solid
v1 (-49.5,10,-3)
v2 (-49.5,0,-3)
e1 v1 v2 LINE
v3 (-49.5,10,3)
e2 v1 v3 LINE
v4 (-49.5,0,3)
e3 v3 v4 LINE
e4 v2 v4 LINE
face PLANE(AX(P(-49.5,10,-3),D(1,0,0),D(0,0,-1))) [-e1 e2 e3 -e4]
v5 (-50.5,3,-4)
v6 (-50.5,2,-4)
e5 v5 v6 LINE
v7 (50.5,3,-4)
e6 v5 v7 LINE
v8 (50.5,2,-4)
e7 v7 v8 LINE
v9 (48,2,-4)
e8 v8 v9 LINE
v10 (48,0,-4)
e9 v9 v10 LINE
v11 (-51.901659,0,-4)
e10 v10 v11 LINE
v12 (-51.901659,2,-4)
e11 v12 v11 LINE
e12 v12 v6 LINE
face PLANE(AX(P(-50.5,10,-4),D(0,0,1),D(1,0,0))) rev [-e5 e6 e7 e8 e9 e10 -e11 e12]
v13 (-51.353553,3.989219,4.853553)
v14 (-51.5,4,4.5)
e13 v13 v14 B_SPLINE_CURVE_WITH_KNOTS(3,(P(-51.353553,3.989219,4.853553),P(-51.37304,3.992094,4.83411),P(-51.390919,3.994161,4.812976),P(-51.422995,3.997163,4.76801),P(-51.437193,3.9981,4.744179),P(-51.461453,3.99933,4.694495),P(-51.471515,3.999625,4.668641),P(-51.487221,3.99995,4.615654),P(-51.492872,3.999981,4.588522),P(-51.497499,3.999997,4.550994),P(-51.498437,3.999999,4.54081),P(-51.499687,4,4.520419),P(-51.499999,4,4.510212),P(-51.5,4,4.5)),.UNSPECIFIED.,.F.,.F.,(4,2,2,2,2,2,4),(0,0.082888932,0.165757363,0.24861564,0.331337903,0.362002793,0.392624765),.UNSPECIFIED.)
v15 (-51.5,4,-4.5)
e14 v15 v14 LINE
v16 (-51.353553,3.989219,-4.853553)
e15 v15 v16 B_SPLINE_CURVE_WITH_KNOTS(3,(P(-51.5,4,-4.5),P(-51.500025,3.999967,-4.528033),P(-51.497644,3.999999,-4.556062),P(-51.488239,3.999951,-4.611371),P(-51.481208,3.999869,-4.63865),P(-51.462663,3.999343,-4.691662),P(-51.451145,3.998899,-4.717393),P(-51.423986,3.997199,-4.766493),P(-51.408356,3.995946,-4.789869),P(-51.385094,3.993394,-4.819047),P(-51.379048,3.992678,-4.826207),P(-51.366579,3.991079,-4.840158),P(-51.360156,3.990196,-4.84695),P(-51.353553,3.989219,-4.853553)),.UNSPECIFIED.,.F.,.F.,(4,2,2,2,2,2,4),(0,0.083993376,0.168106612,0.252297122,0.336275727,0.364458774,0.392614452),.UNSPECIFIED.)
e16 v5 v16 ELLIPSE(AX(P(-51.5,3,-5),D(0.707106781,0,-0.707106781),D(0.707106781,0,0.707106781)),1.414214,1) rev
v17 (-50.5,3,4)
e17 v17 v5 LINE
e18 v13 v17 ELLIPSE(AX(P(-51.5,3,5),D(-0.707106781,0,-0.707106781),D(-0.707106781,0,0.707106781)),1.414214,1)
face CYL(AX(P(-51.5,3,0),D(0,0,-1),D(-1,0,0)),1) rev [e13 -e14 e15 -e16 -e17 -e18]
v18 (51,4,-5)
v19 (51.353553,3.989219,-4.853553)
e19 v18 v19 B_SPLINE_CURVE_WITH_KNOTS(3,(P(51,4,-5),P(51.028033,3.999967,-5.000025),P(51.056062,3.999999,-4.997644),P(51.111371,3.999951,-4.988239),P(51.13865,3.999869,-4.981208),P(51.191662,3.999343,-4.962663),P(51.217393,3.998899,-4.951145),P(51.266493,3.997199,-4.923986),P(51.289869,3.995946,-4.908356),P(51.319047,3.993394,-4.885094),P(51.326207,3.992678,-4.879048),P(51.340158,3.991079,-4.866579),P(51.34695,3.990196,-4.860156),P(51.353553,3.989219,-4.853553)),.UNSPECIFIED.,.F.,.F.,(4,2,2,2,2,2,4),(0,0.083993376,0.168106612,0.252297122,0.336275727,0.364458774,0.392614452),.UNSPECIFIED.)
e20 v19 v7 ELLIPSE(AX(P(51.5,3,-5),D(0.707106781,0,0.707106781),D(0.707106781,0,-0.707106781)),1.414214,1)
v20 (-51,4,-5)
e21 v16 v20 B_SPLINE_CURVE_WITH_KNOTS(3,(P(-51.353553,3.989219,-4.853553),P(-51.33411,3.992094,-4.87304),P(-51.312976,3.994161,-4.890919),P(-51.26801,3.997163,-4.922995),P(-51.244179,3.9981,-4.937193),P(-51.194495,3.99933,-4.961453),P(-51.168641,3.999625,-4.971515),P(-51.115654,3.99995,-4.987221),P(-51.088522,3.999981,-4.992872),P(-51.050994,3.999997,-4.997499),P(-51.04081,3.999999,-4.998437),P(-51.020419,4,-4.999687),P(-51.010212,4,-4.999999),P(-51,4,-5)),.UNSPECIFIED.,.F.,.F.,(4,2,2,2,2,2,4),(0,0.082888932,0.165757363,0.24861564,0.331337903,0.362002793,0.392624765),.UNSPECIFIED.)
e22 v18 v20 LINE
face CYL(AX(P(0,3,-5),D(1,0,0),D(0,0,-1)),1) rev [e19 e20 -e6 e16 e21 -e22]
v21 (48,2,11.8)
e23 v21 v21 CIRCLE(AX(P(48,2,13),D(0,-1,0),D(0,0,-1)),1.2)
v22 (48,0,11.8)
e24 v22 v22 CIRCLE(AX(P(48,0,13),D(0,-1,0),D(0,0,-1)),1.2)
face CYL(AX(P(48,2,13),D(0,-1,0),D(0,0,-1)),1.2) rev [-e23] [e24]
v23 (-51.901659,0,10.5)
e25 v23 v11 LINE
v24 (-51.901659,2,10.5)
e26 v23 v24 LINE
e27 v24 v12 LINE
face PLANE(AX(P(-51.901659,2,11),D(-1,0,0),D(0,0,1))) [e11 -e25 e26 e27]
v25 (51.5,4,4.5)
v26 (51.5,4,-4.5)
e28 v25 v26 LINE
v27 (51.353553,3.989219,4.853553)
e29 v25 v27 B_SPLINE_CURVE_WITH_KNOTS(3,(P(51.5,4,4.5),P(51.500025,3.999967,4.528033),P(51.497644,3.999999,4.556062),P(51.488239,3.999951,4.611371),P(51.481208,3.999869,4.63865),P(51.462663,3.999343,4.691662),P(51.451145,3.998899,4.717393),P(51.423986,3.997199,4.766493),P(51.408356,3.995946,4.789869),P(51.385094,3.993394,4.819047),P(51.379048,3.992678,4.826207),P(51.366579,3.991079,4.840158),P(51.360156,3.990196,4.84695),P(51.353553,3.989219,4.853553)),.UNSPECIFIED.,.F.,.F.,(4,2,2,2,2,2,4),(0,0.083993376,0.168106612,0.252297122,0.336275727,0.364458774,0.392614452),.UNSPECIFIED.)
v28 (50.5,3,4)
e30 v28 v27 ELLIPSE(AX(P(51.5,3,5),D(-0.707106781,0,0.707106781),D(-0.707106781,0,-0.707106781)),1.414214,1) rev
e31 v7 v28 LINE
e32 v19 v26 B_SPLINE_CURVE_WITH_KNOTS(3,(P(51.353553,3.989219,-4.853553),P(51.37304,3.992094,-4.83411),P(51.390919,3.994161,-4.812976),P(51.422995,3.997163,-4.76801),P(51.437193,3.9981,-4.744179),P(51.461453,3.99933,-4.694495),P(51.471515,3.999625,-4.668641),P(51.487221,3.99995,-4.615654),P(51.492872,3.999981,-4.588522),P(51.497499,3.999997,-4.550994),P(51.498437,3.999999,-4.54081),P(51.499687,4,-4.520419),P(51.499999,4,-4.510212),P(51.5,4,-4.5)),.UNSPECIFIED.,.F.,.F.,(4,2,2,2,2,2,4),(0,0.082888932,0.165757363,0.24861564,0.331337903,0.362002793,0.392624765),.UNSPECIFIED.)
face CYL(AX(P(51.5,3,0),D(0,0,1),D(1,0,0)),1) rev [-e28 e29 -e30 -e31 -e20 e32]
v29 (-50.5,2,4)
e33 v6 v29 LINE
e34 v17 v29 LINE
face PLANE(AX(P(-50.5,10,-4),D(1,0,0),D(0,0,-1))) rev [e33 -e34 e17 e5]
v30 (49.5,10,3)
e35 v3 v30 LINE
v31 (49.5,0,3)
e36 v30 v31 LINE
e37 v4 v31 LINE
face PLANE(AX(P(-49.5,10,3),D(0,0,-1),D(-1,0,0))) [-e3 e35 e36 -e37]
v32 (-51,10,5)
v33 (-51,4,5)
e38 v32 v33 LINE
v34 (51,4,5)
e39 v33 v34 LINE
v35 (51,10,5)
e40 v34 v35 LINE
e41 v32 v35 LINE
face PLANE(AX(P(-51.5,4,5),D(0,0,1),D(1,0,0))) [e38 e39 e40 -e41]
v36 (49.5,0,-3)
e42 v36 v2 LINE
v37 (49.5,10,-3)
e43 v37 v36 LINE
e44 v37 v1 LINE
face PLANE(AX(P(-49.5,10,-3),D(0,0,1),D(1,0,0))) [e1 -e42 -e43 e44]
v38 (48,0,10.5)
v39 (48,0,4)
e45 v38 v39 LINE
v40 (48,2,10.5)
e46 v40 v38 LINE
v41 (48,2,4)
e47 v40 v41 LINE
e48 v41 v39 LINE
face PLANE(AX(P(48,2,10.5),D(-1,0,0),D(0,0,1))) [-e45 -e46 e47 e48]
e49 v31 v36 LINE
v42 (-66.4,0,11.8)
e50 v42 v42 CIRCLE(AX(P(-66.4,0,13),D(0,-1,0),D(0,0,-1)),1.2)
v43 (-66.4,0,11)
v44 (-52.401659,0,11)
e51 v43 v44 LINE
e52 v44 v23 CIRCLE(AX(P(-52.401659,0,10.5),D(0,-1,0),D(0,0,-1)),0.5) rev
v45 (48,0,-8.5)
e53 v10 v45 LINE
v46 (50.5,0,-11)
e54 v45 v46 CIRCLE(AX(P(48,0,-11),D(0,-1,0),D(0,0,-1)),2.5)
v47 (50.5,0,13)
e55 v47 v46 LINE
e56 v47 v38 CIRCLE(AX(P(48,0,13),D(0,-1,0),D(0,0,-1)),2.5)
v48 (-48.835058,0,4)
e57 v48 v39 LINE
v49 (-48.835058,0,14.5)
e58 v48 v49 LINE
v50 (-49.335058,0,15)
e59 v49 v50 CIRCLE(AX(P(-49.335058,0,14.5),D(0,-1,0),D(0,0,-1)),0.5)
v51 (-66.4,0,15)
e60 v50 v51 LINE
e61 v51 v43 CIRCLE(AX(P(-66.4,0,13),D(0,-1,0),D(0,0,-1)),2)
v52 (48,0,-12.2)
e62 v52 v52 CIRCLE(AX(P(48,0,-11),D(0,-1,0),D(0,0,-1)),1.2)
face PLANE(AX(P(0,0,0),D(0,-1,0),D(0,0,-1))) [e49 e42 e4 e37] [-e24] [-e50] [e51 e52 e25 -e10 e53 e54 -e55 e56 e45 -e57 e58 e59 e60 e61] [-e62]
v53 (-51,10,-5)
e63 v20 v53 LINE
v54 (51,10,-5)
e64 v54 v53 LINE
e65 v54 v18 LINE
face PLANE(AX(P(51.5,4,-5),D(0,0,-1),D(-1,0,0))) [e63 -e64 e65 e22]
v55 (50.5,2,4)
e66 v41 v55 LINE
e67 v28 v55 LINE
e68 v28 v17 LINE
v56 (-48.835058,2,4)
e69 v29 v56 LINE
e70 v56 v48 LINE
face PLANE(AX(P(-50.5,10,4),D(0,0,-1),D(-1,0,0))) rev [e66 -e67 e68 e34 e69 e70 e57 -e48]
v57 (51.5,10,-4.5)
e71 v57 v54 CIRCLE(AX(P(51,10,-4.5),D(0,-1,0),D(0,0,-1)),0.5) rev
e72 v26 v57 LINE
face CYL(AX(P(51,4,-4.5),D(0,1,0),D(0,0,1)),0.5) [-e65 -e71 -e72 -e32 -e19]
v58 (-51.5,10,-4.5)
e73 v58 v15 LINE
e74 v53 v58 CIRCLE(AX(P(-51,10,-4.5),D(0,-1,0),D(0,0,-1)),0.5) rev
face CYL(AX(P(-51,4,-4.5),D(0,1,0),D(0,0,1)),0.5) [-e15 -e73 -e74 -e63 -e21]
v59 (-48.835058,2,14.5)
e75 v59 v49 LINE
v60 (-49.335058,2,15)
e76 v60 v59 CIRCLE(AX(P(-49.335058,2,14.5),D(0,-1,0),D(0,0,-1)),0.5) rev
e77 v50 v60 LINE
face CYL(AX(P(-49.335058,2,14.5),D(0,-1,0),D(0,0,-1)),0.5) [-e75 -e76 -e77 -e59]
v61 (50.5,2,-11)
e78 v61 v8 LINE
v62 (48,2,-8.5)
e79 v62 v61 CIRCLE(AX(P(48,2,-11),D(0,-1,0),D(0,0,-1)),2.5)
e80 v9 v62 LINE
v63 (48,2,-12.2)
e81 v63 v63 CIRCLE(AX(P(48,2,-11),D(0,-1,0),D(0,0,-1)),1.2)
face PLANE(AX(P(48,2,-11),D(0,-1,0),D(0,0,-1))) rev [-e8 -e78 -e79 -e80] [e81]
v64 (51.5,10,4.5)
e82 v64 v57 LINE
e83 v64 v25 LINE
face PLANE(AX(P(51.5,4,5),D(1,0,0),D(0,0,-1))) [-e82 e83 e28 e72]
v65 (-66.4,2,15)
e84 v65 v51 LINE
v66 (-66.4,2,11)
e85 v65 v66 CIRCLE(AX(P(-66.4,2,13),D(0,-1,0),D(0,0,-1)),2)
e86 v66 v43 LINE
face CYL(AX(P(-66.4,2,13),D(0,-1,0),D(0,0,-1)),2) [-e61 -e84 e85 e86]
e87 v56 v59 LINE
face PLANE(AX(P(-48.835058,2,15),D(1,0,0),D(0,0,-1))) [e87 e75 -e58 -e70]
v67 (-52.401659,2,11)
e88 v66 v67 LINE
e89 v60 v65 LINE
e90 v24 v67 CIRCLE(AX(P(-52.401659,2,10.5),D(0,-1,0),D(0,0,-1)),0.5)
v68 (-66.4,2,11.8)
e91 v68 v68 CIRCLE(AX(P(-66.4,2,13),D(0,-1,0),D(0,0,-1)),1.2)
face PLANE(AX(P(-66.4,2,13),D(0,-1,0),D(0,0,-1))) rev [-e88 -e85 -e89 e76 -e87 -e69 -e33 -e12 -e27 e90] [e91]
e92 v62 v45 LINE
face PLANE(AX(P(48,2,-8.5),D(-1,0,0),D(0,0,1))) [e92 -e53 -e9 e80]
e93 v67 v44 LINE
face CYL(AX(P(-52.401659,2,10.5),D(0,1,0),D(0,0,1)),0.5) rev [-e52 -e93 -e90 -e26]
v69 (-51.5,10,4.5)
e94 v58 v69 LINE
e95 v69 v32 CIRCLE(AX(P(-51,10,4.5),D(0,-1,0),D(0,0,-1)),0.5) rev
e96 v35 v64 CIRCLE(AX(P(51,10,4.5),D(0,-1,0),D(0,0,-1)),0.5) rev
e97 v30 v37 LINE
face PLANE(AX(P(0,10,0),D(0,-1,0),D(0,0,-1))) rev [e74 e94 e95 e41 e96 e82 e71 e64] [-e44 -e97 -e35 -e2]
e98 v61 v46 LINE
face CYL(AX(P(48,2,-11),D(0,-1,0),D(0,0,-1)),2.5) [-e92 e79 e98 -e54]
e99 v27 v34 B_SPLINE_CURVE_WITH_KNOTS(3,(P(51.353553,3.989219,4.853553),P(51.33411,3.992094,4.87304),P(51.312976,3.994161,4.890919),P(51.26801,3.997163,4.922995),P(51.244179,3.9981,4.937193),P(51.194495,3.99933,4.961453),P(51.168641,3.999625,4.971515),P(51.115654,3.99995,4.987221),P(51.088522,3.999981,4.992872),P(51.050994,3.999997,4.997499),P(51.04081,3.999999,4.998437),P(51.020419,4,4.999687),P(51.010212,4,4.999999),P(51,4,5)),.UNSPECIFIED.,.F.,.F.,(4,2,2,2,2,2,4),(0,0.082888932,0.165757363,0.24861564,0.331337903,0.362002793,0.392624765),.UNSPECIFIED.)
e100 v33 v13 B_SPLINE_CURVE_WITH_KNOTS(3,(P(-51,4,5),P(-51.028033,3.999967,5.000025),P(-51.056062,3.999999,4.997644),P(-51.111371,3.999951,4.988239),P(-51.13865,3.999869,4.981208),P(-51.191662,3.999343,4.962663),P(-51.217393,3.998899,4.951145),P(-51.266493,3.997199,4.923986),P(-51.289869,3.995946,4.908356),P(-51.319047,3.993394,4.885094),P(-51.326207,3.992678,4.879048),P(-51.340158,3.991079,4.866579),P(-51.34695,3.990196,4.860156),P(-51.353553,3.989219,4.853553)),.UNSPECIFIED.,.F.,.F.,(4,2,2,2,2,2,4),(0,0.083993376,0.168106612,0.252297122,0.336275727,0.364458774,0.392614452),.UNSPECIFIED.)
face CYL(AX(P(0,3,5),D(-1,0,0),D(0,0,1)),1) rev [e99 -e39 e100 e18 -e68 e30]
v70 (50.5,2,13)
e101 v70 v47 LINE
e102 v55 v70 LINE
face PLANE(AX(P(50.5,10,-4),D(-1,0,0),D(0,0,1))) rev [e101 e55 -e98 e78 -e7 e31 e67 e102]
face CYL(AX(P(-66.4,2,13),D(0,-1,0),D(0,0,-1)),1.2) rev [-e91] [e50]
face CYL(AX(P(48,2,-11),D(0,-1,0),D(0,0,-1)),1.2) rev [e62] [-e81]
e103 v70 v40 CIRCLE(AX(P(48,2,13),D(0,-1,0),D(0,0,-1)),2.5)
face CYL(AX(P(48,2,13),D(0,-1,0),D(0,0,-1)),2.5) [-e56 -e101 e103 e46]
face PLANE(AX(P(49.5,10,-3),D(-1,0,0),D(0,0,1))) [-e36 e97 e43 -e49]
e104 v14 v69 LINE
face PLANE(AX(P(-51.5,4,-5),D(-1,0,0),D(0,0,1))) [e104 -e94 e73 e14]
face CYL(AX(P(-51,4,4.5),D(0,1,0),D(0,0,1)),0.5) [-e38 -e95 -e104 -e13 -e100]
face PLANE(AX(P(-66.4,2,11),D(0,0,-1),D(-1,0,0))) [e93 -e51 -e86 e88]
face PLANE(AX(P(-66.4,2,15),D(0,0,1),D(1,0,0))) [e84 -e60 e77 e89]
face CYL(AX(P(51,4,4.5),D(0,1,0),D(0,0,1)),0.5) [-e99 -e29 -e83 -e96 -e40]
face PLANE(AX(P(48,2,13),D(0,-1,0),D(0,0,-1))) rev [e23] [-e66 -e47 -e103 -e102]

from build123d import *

# Parameters (mm, degrees)
SKETCH1_W           = 101
SKETCH1_H           = 8
SKETCH1_W_2         = 99
SKETCH1_H_2         = 6
BOSS_EXTRUDE1_DEPTH = 10
SKETCH2_R           = 1.2
BOSS_EXTRUDE2_DEPTH = 2
SKETCH3_W           = 103
SKETCH3_H           = 10
SKETCH3_W_2         = 101
SKETCH3_H_2         = 8
BOSS_EXTRUDE3_DEPTH = 6
FILLET4_R           = 1
FILLET5_R           = 1
FILLET6_R           = 1
FILLET7_R           = 1
FILLET8_R           = 0.5
FILLET9_R           = 0.5


# Some blends are built 0.0001 mm under size
with BuildPart() as part:
    # Sketch1 → Boss-Extrude1 (new body)
    with BuildSketch(Plane(origin=(0, 0, 0), x_dir=(1, 0, 0), z_dir=(0, 1, 0))):
        Rectangle(SKETCH1_W, SKETCH1_H)
        Rectangle(SKETCH1_W_2, SKETCH1_H_2, mode=Mode.SUBTRACT)
    extrude(amount=BOSS_EXTRUDE1_DEPTH)

    # Sketch2 → Boss-Extrude2 (add)
    # profile 1 of 3: a face of its own
    with BuildSketch(Plane.XZ):
        with BuildLine():
            Line((48, 4), (50.5, 4))
            Line((50.5, 4), (50.5, 13))
            ThreePointArc((50.5, 13), (46.232233047, 14.767766953), (48, 10.5))
            Line((48, 10.5), (48, 4))
        make_face()
        with Locations(Location((48, 13, 0), (0, 0, 270))):
            Circle(SKETCH2_R, mode=Mode.SUBTRACT)
    # profile 2 of 3: a face of its own
    with BuildSketch(Plane.XZ):
        with BuildLine():
            Line((48, -4), (50.5, -4))
            Line((50.5, -4), (50.5, -11))
            ThreePointArc((50.5, -11), (46.232233047, -12.767766953), (48, -8.5))
            Line((48, -8.5), (48, -4))
        make_face()
        with Locations(Location((48, -11, 0), (0, 0, 270))):
            Circle(SKETCH2_R, mode=Mode.SUBTRACT)
    # profile 3 of 3: a face of its own
    with BuildSketch(Plane.XZ):
        with BuildLine():
            Line((-66.4, 15), (-48.835058433, 15))
            Line((-48.835058433, 15), (-48.835058433, 4))
            Line((-48.835058433, 4), (-50.5, 4))
            Line((-50.5, 4), (-50.5, -4))
            Line((-50.5, -4), (-51.901659191, -4))
            Line((-51.901659191, -4), (-51.901659191, 11))
            Line((-51.901659191, 11), (-66.4, 11))
            ThreePointArc((-66.4, 11), (-68.4, 13), (-66.4, 15))
        make_face()
        with Locations(Location((-66.4, 13, 0), (0, 0, 270))):
            Circle(SKETCH2_R, mode=Mode.SUBTRACT)
    extrude(amount=-BOSS_EXTRUDE2_DEPTH)

    # Sketch3 → Boss-Extrude3 (add)
    with BuildSketch(Plane(origin=(0, 10, 0), x_dir=(1, 0, 0), z_dir=(0, 1, 0))):
        Rectangle(SKETCH3_W, SKETCH3_H)
        Rectangle(SKETCH3_W_2, SKETCH3_H_2, mode=Mode.SUBTRACT)
    extrude(amount=-BOSS_EXTRUDE3_DEPTH)

    # Fillet4
    fillet4_edges = [part.edges().sort_by_distance(p)[0] for p in [
        (0, 4, -4),
    ]]
    fillet(fillet4_edges, radius=FILLET4_R - 0.0001)  # a hair under: the kernel refuses the full size

    # Fillet5
    fillet5_edges = [part.edges().sort_by_distance(p)[0] for p in [
        (0, 4, 4),
    ]]
    fillet(fillet5_edges, radius=FILLET5_R - 0.0001)  # a hair under: the kernel refuses the full size

    # Fillet6
    fillet6_edges = [part.edges().sort_by_distance(p)[0] for p in [
        (50.5, 4, 0),
    ]]
    fillet(fillet6_edges, radius=FILLET6_R - 0.0001)  # a hair under: the kernel refuses the full size

    # Fillet7
    fillet7_edges = [part.edges().sort_by_distance(p)[0] for p in [
        (-50.5, 4, 0),
    ]]
    fillet(fillet7_edges, radius=FILLET7_R - 0.0001)  # a hair under: the kernel refuses the full size

    # Fillet8
    fillet8_edges = [part.edges().sort_by_distance(p)[0] for p in [
        (-51.901659191, 1, 11),
        (-48.835058433, 1, 15),
    ]]
    fillet(fillet8_edges, radius=FILLET8_R)

    # Fillet9
    # the kernel refuses this fillet: 0.5 mm, written as the material it takes off along each edge
    with BuildSketch(Plane(origin=(51.5, 11.25, -5), x_dir=(-1, 0, 0), z_dir=(0, -1, 0))) as fillet9_piece_1:
        with BuildLine():
            CenterArc((FILLET9_R, -FILLET9_R), FILLET9_R, 90, 90)
            Line((0, -FILLET9_R), (0, 0))
            Line((0, 0), (FILLET9_R, 0))
        make_face()
    extrude(amount=8.5, mode=Mode.SUBTRACT)
    with BuildSketch(Plane(origin=(51.5, 11.25, 5), x_dir=(-1, 0, 0), z_dir=(0, -1, 0)), Plane(origin=(-51.5, 11.25, 5), x_dir=(0, 0, -1), z_dir=(0, -1, 0)), Plane(origin=(-51.5, 11.25, -5), x_dir=(1, 0, 0), z_dir=(0, -1, 0))) as fillet9_piece_2:
        with BuildLine():
            CenterArc((FILLET9_R, FILLET9_R), FILLET9_R, 180, 90)
            Line((0, FILLET9_R), (0, 0))
            Line((0, 0), (FILLET9_R, 0))
        make_face()
    extrude(amount=8.5, mode=Mode.SUBTRACT)


solid = part.part
